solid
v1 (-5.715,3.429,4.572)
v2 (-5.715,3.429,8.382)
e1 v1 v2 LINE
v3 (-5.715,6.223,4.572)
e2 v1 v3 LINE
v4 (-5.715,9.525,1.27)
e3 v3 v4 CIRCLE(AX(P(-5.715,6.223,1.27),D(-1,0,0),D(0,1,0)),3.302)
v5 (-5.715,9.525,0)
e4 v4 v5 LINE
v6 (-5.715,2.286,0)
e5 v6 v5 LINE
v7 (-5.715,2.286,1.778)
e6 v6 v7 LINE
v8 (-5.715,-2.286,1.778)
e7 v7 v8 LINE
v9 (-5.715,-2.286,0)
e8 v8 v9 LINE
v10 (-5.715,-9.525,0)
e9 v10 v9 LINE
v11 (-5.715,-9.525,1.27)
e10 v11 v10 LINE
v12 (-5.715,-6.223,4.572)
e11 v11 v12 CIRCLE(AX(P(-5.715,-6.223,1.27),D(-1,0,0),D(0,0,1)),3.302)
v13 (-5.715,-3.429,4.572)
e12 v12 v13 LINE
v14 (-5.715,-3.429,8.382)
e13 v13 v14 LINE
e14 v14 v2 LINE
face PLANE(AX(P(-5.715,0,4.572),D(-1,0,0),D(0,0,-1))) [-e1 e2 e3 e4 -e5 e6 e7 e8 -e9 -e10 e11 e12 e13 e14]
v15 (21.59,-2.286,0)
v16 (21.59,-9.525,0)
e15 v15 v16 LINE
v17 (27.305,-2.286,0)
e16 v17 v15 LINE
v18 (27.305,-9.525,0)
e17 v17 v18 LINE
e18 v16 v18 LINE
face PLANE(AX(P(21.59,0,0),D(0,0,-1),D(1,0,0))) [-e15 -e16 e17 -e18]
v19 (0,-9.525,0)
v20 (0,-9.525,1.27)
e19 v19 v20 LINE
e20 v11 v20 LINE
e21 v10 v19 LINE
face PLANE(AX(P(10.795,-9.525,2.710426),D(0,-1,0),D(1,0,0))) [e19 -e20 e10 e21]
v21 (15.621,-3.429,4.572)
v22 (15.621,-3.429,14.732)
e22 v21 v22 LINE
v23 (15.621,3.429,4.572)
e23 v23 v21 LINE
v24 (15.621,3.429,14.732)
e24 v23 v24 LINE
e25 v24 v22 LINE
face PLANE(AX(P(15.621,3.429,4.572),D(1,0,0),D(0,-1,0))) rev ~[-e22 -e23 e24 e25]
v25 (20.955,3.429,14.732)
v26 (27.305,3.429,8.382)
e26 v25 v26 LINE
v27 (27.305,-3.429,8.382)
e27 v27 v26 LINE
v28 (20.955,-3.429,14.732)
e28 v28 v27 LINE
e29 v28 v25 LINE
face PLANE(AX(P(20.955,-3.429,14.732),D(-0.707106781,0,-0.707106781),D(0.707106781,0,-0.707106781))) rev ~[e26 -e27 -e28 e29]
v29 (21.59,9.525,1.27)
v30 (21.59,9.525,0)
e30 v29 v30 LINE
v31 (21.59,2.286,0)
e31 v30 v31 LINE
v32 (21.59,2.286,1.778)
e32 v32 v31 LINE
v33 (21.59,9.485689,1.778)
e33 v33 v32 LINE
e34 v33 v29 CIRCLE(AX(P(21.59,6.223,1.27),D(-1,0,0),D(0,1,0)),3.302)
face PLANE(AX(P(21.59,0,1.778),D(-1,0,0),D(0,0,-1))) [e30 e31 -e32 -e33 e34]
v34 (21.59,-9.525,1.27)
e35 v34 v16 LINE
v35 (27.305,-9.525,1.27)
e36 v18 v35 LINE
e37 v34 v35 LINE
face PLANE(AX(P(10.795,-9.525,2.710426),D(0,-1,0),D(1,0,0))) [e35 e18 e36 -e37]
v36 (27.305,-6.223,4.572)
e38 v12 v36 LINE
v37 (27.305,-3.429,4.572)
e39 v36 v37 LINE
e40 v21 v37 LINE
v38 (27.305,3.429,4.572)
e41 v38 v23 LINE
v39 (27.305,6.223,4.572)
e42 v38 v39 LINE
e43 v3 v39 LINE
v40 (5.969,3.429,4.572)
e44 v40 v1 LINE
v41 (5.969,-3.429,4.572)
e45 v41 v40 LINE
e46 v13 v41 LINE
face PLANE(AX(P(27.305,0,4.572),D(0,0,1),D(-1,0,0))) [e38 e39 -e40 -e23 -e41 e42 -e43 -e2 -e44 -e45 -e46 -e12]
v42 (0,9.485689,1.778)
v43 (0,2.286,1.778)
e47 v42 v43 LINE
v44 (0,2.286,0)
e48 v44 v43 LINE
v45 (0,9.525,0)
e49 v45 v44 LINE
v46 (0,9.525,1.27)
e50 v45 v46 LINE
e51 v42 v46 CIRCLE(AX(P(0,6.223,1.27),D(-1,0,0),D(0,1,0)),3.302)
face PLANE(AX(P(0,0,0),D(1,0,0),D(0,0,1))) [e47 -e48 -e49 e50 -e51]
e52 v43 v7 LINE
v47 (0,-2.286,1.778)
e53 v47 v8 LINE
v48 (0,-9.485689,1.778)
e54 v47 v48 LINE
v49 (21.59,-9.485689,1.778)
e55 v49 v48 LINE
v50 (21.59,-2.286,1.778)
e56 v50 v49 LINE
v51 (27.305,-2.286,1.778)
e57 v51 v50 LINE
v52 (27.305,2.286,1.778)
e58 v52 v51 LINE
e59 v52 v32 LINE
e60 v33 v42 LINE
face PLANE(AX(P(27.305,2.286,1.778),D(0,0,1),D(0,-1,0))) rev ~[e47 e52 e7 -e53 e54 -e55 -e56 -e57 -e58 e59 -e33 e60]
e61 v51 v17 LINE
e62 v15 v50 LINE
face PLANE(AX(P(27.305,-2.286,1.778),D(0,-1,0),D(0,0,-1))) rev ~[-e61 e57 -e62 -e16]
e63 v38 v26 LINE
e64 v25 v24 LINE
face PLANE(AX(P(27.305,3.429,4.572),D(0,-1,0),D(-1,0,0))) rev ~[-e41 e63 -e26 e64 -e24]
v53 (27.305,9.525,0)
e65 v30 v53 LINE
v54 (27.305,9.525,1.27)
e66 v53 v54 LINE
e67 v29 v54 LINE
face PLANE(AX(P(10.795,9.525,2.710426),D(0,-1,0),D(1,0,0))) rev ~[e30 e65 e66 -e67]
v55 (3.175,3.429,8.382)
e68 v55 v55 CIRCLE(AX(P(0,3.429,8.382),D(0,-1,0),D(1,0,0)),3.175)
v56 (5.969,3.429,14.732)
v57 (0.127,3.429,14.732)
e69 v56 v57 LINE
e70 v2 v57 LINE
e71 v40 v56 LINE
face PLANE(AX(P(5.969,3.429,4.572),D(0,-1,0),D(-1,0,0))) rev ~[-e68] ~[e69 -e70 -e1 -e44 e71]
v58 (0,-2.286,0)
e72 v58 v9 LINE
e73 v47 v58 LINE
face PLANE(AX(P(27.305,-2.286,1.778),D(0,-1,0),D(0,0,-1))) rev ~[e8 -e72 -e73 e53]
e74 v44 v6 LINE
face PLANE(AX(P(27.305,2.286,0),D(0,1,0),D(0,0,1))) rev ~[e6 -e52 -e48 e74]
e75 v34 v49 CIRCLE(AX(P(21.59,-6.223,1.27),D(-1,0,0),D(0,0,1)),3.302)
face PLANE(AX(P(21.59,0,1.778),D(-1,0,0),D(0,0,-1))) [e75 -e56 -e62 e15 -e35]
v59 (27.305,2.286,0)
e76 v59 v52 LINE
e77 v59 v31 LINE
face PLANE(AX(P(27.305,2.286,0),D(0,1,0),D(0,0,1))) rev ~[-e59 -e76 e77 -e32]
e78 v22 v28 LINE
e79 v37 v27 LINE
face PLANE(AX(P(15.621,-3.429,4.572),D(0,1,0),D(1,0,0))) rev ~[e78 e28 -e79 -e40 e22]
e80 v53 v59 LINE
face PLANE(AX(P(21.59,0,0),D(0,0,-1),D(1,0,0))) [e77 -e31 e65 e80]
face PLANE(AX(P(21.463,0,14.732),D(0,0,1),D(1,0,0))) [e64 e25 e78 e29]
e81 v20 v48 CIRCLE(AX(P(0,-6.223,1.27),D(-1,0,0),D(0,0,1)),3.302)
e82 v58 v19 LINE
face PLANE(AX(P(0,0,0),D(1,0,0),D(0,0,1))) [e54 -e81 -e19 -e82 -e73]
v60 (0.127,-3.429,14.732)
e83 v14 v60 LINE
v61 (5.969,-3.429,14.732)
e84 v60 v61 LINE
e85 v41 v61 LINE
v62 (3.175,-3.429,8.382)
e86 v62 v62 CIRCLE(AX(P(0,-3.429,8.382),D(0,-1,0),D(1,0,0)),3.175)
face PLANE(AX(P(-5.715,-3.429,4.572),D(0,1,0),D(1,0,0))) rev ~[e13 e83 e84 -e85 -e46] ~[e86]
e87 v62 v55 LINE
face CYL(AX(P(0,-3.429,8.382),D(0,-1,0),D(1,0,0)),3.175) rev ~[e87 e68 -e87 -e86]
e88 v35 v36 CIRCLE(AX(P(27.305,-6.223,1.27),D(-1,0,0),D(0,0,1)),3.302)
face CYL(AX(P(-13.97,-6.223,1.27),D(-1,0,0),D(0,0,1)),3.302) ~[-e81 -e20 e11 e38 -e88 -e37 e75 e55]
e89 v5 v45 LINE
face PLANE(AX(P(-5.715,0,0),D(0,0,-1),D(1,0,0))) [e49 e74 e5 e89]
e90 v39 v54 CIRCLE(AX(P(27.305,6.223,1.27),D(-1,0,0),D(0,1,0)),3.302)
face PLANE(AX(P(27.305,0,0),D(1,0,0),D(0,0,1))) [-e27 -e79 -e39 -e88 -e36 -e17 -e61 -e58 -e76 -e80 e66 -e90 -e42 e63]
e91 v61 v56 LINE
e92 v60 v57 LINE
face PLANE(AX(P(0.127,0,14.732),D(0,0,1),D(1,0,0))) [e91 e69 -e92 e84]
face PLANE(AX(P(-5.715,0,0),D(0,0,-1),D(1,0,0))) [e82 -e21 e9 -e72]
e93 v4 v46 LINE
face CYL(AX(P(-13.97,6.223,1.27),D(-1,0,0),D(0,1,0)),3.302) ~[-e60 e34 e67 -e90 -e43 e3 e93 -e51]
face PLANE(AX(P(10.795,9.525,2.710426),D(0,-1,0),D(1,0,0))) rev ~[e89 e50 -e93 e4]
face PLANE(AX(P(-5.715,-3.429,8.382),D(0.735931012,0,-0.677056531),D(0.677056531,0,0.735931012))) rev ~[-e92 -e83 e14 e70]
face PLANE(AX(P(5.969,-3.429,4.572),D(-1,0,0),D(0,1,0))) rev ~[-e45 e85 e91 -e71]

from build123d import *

# Parameters (mm, degrees)
F1_DEPTH    = 9.525
F3_DEPTH    = 33.02
F4_T1_DEPTH = 49.53
F6_DEPTH    = 10.16
F7_R        = 3.175
F8_DEPTH    = 25.4
F10_DEPTH   = 25.4


# Not quite as in the source:
# - a fillet or chamfer that OpenCascade refuses, or shapes differently, is made with other operations: its cross-section is extruded or revolved along the edge and cut away or added


with BuildPart() as f1:
    # F0 (on Front) → F1 (new body, symmetric)
    with BuildSketch(Plane.XZ):
        Polygon((-5.715, 0), (0, 0), (0, 1.778), (21.59, 1.778), (21.59, 0), (27.305, 0), (27.305, 4.572), (-5.715, 4.572), align=None)
    extrude(amount=F1_DEPTH, both=True)

    # F2 (on face) → F3 (cut)
    with BuildSketch(Plane.YZ.offset(27.305)):
        Polygon((-2.286, 0), (0, 0), (2.286, 0), (2.286, 1.778), (0, 1.778), (-2.286, 1.778), align=None)
    extrude(amount=-F3_DEPTH, mode=Mode.SUBTRACT)

    # F4: fillet of radius 3.302 on 2 edges, made by hand

    # F4_s2 → F4_t1 (cut)
    with BuildSketch(Plane.YZ.offset(-13.97)):
        with BuildLine():
            ThreePointArc((-6.223, 4.572), (-8.5578665915, 3.6048665915), (-9.525, 1.27))
            Line((-9.525, 1.27), (-9.525, 4.572))
            Line((-9.525, 4.572), (-6.223, 4.572))
        make_face()
        with BuildLine():
            ThreePointArc((9.525, 1.27), (8.5578665915, 3.6048665915), (6.223, 4.572))
            Line((6.223, 4.572), (9.525, 4.572))
            Line((9.525, 4.572), (9.525, 1.27))
        make_face()
    extrude(amount=F4_T1_DEPTH, mode=Mode.SUBTRACT)

    # F5 (on face) → F6 (join)
    with BuildSketch(Plane.XY.offset(4.572)):
        Polygon((-5.715, 3.429), (-5.715, 0), (-5.715, -3.429), (5.969, -3.429), (5.969, 3.429), align=None)
        Polygon((27.305, 0), (27.305, 3.429), (15.621, 3.429), (15.621, -3.429), (27.305, -3.429), align=None)
    extrude(amount=F6_DEPTH)

    # F7 (on face) → F8 (cut)
    with BuildSketch(Plane.XZ.offset(3.429)):
        Polygon((-5.715, 14.732), (-5.715, 8.382), (0.127, 14.732), align=None)
        with Locations((0, 8.382)):
            Circle(F7_R)
    extrude(amount=-F8_DEPTH, mode=Mode.SUBTRACT)

    # F9 (on face) → F10 (cut)
    with BuildSketch(Plane.XZ.offset(3.429)):
        Polygon((27.305, 14.732), (20.955, 14.732), (27.305, 8.382), align=None)
    extrude(amount=-F10_DEPTH, mode=Mode.SUBTRACT)


solid = f1.part
